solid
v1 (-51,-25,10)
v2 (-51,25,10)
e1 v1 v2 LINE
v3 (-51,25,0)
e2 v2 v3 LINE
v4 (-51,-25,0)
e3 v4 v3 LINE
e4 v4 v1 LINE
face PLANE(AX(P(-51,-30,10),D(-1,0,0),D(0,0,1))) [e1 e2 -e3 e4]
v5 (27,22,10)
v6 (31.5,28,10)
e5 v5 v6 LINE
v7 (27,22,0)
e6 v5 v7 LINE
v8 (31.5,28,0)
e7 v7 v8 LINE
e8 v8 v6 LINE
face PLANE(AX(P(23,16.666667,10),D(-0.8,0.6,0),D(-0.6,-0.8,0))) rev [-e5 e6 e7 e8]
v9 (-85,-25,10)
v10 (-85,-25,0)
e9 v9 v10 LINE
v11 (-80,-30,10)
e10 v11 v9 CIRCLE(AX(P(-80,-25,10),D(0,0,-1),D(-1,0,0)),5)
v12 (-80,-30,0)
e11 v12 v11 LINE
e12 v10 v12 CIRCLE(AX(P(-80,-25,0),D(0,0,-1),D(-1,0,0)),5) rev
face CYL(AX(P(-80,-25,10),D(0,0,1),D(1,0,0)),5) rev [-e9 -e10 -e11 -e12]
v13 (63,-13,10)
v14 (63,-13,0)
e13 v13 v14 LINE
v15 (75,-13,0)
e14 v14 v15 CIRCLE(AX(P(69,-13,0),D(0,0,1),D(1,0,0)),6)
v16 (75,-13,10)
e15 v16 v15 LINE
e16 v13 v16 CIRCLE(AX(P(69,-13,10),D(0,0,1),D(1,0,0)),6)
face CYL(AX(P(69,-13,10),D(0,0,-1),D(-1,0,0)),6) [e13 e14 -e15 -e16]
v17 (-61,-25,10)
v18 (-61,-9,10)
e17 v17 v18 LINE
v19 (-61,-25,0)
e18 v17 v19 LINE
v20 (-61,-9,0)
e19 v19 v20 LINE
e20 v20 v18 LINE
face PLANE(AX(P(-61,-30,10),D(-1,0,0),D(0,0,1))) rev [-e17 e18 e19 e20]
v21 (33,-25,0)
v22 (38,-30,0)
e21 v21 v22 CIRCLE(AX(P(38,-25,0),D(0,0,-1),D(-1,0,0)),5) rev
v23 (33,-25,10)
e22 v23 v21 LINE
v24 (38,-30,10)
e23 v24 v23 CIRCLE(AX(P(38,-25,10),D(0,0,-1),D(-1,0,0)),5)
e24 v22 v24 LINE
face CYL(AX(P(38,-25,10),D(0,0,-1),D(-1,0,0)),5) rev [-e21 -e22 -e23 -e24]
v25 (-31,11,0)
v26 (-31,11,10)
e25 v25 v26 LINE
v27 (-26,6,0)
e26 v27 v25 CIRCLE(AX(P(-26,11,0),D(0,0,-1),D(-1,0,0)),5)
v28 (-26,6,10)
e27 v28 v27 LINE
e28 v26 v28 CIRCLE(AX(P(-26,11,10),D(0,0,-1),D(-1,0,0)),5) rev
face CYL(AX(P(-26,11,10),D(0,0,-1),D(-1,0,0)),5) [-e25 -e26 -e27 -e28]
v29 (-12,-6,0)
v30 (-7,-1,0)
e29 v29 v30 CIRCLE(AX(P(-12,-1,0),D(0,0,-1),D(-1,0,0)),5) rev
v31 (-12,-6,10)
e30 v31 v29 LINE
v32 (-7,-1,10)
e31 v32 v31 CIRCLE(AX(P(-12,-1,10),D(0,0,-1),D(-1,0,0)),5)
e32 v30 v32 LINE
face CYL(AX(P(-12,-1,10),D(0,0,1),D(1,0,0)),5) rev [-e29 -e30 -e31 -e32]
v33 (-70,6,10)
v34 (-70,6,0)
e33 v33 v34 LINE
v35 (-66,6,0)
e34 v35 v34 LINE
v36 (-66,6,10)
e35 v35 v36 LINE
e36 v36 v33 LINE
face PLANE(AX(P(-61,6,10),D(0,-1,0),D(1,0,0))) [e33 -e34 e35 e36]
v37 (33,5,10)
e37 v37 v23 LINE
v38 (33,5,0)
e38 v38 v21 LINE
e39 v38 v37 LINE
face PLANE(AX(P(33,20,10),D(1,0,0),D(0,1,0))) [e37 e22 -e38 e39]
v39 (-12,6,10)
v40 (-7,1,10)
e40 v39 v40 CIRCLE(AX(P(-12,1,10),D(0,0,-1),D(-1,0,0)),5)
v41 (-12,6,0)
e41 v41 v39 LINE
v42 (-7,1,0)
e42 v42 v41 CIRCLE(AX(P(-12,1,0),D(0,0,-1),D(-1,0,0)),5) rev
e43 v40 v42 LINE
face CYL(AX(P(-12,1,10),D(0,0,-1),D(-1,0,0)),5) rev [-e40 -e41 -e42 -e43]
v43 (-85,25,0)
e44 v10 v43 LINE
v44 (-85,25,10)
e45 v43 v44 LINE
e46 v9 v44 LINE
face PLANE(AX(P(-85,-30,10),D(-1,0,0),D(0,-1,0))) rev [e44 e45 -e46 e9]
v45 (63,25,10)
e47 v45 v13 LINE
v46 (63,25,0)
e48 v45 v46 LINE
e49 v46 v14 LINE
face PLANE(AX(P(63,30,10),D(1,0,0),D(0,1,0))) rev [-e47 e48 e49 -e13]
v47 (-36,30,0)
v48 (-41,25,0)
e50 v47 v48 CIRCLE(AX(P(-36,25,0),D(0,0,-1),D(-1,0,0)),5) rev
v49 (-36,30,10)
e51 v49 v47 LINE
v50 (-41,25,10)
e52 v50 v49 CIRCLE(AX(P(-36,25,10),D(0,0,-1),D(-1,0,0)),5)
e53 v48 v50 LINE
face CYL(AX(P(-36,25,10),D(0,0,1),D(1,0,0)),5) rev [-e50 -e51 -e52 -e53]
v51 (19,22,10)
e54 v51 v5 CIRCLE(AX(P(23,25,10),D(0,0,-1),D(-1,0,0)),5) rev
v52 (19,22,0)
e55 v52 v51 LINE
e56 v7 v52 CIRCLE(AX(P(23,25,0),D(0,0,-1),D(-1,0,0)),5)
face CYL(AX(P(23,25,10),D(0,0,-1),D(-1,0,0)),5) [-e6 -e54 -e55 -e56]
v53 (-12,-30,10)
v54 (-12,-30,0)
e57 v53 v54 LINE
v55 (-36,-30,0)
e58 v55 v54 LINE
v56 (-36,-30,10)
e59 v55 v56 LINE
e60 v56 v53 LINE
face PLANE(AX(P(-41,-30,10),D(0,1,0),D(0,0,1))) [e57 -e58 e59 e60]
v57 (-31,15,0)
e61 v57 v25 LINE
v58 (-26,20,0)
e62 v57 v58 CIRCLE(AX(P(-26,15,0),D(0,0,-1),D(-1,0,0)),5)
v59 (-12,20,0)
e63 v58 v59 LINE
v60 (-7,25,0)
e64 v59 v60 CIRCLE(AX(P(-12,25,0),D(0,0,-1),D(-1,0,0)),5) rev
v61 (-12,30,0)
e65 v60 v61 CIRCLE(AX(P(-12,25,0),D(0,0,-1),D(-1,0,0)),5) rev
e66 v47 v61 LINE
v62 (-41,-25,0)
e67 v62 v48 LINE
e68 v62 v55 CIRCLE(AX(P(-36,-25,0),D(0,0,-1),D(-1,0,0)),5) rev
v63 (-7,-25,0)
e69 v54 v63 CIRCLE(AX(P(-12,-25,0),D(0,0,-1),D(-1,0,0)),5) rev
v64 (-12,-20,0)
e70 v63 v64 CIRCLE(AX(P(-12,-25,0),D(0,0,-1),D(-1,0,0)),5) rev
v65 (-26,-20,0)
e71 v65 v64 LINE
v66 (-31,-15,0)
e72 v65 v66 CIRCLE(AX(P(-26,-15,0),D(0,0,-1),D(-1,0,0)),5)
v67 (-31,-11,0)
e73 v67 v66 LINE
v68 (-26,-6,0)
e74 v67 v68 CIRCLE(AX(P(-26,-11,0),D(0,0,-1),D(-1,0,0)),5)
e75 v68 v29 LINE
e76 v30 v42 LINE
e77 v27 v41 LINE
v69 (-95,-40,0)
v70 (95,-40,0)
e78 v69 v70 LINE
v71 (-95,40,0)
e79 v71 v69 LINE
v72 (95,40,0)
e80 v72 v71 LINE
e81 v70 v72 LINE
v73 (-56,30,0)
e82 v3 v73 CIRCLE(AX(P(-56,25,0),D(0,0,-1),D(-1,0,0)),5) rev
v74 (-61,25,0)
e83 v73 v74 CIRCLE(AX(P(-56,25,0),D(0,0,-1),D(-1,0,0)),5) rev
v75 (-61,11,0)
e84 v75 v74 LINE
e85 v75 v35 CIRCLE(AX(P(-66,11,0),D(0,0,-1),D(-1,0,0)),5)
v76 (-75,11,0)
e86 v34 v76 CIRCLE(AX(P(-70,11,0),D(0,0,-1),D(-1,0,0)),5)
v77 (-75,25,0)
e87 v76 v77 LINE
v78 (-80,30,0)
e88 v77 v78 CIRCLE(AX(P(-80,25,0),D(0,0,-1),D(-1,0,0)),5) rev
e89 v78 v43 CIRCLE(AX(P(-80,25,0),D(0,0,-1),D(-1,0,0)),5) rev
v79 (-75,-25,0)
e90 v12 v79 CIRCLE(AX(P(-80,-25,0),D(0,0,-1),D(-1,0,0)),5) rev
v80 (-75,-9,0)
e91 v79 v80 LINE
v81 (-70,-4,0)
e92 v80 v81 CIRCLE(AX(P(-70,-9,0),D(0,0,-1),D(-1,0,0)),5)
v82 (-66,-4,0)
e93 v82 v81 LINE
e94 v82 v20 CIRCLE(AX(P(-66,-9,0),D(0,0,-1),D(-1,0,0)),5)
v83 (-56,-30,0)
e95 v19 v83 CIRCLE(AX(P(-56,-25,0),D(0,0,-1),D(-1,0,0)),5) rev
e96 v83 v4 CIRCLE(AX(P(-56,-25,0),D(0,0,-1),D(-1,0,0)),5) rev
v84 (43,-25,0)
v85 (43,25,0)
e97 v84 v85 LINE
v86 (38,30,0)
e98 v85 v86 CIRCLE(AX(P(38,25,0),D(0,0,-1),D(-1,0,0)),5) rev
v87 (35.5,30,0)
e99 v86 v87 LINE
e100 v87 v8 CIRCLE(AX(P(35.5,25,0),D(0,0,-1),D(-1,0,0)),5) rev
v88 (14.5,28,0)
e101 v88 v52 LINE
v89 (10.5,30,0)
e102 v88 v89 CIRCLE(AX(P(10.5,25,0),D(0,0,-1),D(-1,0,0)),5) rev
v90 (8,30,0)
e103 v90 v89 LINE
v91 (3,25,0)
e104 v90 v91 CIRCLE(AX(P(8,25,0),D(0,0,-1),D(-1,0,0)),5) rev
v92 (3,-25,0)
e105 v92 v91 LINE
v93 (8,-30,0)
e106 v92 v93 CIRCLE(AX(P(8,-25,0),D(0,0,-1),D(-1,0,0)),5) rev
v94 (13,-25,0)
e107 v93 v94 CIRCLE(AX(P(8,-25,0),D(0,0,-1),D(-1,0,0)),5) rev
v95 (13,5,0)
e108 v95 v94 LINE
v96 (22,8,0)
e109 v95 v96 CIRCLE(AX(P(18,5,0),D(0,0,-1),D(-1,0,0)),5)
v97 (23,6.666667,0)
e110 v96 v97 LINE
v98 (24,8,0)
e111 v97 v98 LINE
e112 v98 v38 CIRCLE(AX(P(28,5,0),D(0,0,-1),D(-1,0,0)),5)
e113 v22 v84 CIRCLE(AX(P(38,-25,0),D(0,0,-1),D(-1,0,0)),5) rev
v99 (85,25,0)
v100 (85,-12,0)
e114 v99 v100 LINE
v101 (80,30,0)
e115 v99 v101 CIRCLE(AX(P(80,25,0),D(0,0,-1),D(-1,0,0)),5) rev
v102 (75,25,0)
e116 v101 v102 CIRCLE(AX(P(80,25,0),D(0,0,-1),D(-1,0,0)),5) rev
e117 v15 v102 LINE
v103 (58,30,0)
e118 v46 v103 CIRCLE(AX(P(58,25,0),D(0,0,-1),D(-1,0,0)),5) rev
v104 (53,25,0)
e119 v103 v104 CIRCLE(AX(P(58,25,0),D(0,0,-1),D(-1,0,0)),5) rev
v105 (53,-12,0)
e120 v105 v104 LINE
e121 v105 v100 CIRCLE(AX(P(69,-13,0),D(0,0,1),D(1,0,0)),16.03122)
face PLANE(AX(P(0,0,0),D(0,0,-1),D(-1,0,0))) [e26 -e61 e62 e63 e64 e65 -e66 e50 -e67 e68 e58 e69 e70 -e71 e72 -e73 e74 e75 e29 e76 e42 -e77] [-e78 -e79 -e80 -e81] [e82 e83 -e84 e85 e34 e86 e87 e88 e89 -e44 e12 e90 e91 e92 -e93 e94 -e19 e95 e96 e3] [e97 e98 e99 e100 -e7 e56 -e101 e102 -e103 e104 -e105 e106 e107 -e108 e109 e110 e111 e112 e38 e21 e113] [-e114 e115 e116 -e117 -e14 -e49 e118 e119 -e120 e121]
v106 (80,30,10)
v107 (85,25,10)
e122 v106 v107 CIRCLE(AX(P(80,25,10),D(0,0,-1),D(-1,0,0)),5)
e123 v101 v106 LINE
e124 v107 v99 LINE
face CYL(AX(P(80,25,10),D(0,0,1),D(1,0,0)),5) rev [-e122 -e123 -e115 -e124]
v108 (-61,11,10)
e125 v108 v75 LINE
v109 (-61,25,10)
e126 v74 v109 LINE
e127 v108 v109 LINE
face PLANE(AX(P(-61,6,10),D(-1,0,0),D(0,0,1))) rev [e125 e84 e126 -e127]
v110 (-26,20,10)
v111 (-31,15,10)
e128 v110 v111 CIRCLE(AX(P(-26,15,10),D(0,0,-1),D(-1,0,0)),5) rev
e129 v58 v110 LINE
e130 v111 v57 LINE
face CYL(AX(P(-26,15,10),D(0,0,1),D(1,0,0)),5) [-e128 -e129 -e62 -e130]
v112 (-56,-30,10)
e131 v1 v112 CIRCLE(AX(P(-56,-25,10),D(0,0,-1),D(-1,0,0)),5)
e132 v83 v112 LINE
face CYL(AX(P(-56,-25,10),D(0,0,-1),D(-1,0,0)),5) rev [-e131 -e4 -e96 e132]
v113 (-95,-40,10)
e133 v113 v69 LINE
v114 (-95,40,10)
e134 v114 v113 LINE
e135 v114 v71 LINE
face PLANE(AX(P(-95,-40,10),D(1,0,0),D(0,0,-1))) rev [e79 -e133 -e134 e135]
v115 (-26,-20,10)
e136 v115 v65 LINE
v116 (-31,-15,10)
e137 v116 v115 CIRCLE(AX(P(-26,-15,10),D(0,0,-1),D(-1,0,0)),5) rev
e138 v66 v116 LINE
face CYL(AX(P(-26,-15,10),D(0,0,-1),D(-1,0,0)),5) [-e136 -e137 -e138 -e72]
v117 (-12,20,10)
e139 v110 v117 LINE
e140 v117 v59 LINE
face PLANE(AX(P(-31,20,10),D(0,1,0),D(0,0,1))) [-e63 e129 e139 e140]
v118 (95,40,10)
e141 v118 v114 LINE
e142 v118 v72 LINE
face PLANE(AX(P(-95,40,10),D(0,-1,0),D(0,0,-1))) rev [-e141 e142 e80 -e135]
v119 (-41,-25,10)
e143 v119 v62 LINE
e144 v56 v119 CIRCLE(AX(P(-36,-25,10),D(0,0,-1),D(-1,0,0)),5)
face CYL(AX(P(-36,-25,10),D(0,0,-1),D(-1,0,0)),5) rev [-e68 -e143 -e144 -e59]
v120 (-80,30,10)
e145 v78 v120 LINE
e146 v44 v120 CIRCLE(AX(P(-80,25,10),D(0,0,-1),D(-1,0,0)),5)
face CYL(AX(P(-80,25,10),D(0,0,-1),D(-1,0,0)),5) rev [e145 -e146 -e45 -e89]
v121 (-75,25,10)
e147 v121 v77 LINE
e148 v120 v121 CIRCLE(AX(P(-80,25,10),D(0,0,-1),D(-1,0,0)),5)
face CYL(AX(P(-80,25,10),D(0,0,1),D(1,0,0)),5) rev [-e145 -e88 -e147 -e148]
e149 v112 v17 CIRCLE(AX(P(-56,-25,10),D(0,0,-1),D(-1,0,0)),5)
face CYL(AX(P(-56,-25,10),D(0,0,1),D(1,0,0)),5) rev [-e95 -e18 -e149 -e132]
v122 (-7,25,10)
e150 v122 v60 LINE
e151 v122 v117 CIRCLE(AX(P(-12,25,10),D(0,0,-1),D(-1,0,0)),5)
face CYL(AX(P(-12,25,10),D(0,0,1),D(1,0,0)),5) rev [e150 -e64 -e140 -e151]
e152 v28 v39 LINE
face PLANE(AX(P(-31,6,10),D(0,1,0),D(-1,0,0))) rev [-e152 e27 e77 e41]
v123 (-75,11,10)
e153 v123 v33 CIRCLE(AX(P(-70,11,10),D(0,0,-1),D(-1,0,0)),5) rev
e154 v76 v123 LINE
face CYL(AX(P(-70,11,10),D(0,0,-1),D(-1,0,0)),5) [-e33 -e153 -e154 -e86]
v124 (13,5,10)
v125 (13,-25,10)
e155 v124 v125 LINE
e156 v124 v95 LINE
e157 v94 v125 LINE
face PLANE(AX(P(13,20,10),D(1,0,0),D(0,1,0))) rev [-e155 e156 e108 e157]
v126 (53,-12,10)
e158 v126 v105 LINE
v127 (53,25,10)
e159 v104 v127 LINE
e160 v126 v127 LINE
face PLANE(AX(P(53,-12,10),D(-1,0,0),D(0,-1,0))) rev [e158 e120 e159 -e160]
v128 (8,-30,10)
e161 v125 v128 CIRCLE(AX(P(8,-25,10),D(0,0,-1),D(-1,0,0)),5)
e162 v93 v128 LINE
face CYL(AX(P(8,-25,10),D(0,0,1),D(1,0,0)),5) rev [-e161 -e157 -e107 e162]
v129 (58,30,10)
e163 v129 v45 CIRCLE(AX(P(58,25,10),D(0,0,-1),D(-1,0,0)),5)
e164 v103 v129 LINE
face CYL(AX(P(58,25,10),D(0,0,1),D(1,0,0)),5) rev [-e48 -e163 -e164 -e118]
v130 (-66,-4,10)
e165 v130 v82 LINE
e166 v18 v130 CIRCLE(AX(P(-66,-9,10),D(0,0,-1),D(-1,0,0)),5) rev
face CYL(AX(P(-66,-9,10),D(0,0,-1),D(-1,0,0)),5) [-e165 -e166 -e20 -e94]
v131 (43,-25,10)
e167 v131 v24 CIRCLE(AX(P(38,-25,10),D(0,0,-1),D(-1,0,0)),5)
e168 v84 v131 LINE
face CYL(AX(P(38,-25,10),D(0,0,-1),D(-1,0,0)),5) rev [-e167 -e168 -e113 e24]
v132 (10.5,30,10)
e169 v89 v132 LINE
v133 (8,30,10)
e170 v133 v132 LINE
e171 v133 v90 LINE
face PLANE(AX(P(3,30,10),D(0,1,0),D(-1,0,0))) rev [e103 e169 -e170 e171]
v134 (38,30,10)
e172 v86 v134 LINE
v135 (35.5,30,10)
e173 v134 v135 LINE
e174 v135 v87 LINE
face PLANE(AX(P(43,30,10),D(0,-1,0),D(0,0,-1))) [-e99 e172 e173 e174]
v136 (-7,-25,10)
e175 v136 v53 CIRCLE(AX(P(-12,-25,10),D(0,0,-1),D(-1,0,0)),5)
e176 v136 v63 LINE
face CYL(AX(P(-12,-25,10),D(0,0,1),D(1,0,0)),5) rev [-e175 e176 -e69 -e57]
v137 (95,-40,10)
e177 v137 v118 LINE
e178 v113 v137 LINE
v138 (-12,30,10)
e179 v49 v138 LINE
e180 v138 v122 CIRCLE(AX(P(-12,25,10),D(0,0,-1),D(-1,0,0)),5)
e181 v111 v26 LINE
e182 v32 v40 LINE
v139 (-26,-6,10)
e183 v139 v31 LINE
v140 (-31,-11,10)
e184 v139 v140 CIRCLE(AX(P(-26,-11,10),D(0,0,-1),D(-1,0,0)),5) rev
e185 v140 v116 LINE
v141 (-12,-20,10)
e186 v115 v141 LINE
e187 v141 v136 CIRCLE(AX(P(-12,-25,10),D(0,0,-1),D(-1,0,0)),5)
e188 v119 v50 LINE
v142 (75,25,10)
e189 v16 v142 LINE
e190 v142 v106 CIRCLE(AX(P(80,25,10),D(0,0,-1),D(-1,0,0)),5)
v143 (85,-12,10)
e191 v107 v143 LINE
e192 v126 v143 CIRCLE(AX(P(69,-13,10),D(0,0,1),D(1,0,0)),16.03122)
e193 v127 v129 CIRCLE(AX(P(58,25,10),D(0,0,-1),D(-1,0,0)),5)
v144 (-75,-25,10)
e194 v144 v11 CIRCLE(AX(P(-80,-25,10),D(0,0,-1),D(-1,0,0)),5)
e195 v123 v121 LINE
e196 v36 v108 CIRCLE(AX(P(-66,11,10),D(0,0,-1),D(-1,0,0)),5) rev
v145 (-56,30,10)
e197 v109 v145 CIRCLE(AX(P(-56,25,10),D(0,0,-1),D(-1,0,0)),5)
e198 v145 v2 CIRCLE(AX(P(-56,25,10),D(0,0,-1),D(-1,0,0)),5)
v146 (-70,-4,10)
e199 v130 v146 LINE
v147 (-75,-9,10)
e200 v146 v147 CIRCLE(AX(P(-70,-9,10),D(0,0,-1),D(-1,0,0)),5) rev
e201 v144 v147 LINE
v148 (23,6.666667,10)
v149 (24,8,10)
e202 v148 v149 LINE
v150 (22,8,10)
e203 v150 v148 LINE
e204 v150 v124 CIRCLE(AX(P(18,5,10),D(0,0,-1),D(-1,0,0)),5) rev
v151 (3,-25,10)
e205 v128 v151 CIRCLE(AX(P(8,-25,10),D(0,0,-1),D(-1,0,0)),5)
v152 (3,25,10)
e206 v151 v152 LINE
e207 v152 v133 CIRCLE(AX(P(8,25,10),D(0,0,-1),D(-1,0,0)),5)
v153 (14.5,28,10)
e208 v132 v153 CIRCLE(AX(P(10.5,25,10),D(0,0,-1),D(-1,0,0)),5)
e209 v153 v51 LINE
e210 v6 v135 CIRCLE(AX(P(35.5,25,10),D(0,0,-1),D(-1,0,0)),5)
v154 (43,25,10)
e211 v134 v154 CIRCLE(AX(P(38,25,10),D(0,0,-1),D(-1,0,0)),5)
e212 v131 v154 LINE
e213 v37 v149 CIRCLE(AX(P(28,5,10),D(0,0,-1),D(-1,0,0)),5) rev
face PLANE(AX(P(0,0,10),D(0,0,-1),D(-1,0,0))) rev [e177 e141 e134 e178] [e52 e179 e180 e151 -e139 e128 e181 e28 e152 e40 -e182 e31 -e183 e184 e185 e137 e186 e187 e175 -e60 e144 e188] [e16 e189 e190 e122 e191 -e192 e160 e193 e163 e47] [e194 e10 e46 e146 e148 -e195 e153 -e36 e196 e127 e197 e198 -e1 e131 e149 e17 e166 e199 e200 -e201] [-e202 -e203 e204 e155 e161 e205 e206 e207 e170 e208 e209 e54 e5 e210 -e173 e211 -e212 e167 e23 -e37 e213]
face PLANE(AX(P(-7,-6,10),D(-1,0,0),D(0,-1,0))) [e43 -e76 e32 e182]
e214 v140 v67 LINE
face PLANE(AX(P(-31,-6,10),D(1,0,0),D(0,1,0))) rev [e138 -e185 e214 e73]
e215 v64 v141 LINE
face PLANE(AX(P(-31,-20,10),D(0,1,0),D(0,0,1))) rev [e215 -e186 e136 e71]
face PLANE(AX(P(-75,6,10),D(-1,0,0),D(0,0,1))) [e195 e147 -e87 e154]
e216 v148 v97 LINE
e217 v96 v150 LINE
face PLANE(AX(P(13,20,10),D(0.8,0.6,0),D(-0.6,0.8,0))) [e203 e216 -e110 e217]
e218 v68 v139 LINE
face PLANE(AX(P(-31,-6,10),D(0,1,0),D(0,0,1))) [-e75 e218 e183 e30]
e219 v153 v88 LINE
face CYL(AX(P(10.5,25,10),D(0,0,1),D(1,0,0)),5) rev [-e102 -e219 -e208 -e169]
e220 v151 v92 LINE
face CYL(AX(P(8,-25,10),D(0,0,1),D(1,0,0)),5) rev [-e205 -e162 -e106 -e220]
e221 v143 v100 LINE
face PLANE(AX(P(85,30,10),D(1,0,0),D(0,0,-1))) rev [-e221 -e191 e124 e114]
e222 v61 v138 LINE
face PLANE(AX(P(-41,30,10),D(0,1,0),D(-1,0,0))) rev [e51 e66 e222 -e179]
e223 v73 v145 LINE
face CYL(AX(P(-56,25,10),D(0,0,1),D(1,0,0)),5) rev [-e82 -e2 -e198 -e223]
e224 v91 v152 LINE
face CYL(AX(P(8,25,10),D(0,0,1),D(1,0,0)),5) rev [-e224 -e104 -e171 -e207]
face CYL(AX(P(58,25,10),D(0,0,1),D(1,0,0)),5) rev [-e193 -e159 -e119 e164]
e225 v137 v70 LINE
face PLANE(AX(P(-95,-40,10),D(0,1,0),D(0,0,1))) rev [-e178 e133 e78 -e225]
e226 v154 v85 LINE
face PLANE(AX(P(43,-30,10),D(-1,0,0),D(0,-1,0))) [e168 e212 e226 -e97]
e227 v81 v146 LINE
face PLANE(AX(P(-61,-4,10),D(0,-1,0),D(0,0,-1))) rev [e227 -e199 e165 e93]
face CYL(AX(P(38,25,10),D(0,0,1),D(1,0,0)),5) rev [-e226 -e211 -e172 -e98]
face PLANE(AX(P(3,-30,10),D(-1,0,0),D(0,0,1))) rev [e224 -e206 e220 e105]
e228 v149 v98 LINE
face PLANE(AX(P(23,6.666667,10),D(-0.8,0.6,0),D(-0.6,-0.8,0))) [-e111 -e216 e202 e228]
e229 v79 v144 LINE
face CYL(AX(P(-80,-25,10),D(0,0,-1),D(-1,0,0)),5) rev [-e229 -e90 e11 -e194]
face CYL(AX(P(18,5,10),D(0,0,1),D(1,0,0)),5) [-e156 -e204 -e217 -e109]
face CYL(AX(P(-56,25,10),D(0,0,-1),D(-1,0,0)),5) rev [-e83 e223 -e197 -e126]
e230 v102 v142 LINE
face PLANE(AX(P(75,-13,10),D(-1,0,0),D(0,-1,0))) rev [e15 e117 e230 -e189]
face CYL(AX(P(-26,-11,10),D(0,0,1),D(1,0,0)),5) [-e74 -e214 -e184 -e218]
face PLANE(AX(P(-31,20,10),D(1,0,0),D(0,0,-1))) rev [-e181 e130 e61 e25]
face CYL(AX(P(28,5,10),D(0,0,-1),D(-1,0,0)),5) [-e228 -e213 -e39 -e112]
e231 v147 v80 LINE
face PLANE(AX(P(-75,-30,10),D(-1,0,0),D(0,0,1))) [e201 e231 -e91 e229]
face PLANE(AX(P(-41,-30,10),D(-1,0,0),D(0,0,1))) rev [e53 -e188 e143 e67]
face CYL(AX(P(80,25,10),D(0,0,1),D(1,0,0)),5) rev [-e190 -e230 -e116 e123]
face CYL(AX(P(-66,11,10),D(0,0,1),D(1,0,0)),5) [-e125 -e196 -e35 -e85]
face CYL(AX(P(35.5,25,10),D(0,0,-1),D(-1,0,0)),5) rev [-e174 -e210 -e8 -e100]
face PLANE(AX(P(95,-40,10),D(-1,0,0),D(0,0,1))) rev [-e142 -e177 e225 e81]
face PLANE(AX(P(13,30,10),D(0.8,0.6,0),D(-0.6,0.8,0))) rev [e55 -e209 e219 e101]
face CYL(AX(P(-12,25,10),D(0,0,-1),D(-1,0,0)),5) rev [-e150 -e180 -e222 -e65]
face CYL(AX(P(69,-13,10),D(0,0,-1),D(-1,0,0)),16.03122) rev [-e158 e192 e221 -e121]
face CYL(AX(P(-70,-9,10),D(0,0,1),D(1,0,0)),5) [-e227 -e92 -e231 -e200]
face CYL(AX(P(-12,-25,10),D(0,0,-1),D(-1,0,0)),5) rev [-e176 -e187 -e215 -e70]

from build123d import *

# Parameters (mm, degrees)
SKETCH1_W           = 190
SKETCH1_H           = 80
BOSS_EXTRUDE1_DEPTH = 10
CUT_EXTRUDE1_DEPTH  = 10
FILLET1_R           = 5


with BuildPart() as part:
    # Sketch1 → Boss-Extrude1 (new body)
    with BuildSketch(Plane.XY):
        Rectangle(SKETCH1_W, SKETCH1_H)
    extrude(amount=BOSS_EXTRUDE1_DEPTH)

    # Sketch2 → Cut-Extrude1 (cut)
    with BuildSketch(Plane.XY):
        Polygon((-75, -30), (-85, -30), (-85, 30), (-75, 30), (-75, 6), (-61, 6), (-61, 30), (-51, 30), (-51, -30), (-61, -30), (-61, -4), (-75, -4), align=None)
        Polygon((-31, 20), (-31, 6), (-7, 6), (-7, -6), (-31, -6), (-31, -20), (-7, -20), (-7, -30), (-41, -30), (-41, 30), (-7, 30), (-7, 20), align=None)
        Polygon((43, -30), (33, -30), (33, 20), (23, 6.666666667), (13, 20), (13, -30), (3, -30), (3, 30), (13, 30), (23, 16.666666667), (33, 30), (43, 30), align=None)
        with BuildLine():
            Line((53, -12), (53, 30))
            Line((53, 30), (63, 30))
            Line((63, 30), (63, -13))
            ThreePointArc((63, -13), (69, -19), (75, -13))
            Line((75, -13), (75, 30))
            Line((75, 30), (85, 30))
            Line((85, 30), (85, -12))
            ThreePointArc((85, -12), (69, -29.031219542), (53, -12))
        make_face()
    extrude(amount=CUT_EXTRUDE1_DEPTH, mode=Mode.SUBTRACT)

    # Fillet1
    fillet1_edges = [part.edges().sort_by_distance(p)[0] for p in [
        (63, 30, 5),
        (53, 30, 5),
        (85, 30, 5),
        (75, 30, 5),
        (-85, -30, 5),
        (-75, -30, 5),
        (-75, -4, 5),
        (-61, -4, 5),
        (-61, -30, 5),
        (-51, -30, 5),
        (-51, 30, 5),
        (-61, 30, 5),
        (-61, 6, 5),
        (-75, 6, 5),
        (-75, 30, 5),
        (-85, 30, 5),
        (-31, 20, 5),
        (-7, 20, 5),
        (-7, 30, 5),
        (-41, 30, 5),
        (-41, -30, 5),
        (-7, -30, 5),
        (-7, -20, 5),
        (-31, -20, 5),
        (-31, -6, 5),
        (-7, -6, 5),
        (-7, 6, 5),
        (-31, 6, 5),
        (13, 20, 5),
        (33, 20, 5),
        (33, -30, 5),
        (43, -30, 5),
        (43, 30, 5),
        (33, 30, 5),
        (23, 16.666666667, 5),
        (13, 30, 5),
        (3, 30, 5),
        (3, -30, 5),
        (13, -30, 5),
    ]]
    fillet(fillet1_edges, radius=FILLET1_R - 0.0001)  # a hair under: the kernel refuses the full size


solid = part.part
